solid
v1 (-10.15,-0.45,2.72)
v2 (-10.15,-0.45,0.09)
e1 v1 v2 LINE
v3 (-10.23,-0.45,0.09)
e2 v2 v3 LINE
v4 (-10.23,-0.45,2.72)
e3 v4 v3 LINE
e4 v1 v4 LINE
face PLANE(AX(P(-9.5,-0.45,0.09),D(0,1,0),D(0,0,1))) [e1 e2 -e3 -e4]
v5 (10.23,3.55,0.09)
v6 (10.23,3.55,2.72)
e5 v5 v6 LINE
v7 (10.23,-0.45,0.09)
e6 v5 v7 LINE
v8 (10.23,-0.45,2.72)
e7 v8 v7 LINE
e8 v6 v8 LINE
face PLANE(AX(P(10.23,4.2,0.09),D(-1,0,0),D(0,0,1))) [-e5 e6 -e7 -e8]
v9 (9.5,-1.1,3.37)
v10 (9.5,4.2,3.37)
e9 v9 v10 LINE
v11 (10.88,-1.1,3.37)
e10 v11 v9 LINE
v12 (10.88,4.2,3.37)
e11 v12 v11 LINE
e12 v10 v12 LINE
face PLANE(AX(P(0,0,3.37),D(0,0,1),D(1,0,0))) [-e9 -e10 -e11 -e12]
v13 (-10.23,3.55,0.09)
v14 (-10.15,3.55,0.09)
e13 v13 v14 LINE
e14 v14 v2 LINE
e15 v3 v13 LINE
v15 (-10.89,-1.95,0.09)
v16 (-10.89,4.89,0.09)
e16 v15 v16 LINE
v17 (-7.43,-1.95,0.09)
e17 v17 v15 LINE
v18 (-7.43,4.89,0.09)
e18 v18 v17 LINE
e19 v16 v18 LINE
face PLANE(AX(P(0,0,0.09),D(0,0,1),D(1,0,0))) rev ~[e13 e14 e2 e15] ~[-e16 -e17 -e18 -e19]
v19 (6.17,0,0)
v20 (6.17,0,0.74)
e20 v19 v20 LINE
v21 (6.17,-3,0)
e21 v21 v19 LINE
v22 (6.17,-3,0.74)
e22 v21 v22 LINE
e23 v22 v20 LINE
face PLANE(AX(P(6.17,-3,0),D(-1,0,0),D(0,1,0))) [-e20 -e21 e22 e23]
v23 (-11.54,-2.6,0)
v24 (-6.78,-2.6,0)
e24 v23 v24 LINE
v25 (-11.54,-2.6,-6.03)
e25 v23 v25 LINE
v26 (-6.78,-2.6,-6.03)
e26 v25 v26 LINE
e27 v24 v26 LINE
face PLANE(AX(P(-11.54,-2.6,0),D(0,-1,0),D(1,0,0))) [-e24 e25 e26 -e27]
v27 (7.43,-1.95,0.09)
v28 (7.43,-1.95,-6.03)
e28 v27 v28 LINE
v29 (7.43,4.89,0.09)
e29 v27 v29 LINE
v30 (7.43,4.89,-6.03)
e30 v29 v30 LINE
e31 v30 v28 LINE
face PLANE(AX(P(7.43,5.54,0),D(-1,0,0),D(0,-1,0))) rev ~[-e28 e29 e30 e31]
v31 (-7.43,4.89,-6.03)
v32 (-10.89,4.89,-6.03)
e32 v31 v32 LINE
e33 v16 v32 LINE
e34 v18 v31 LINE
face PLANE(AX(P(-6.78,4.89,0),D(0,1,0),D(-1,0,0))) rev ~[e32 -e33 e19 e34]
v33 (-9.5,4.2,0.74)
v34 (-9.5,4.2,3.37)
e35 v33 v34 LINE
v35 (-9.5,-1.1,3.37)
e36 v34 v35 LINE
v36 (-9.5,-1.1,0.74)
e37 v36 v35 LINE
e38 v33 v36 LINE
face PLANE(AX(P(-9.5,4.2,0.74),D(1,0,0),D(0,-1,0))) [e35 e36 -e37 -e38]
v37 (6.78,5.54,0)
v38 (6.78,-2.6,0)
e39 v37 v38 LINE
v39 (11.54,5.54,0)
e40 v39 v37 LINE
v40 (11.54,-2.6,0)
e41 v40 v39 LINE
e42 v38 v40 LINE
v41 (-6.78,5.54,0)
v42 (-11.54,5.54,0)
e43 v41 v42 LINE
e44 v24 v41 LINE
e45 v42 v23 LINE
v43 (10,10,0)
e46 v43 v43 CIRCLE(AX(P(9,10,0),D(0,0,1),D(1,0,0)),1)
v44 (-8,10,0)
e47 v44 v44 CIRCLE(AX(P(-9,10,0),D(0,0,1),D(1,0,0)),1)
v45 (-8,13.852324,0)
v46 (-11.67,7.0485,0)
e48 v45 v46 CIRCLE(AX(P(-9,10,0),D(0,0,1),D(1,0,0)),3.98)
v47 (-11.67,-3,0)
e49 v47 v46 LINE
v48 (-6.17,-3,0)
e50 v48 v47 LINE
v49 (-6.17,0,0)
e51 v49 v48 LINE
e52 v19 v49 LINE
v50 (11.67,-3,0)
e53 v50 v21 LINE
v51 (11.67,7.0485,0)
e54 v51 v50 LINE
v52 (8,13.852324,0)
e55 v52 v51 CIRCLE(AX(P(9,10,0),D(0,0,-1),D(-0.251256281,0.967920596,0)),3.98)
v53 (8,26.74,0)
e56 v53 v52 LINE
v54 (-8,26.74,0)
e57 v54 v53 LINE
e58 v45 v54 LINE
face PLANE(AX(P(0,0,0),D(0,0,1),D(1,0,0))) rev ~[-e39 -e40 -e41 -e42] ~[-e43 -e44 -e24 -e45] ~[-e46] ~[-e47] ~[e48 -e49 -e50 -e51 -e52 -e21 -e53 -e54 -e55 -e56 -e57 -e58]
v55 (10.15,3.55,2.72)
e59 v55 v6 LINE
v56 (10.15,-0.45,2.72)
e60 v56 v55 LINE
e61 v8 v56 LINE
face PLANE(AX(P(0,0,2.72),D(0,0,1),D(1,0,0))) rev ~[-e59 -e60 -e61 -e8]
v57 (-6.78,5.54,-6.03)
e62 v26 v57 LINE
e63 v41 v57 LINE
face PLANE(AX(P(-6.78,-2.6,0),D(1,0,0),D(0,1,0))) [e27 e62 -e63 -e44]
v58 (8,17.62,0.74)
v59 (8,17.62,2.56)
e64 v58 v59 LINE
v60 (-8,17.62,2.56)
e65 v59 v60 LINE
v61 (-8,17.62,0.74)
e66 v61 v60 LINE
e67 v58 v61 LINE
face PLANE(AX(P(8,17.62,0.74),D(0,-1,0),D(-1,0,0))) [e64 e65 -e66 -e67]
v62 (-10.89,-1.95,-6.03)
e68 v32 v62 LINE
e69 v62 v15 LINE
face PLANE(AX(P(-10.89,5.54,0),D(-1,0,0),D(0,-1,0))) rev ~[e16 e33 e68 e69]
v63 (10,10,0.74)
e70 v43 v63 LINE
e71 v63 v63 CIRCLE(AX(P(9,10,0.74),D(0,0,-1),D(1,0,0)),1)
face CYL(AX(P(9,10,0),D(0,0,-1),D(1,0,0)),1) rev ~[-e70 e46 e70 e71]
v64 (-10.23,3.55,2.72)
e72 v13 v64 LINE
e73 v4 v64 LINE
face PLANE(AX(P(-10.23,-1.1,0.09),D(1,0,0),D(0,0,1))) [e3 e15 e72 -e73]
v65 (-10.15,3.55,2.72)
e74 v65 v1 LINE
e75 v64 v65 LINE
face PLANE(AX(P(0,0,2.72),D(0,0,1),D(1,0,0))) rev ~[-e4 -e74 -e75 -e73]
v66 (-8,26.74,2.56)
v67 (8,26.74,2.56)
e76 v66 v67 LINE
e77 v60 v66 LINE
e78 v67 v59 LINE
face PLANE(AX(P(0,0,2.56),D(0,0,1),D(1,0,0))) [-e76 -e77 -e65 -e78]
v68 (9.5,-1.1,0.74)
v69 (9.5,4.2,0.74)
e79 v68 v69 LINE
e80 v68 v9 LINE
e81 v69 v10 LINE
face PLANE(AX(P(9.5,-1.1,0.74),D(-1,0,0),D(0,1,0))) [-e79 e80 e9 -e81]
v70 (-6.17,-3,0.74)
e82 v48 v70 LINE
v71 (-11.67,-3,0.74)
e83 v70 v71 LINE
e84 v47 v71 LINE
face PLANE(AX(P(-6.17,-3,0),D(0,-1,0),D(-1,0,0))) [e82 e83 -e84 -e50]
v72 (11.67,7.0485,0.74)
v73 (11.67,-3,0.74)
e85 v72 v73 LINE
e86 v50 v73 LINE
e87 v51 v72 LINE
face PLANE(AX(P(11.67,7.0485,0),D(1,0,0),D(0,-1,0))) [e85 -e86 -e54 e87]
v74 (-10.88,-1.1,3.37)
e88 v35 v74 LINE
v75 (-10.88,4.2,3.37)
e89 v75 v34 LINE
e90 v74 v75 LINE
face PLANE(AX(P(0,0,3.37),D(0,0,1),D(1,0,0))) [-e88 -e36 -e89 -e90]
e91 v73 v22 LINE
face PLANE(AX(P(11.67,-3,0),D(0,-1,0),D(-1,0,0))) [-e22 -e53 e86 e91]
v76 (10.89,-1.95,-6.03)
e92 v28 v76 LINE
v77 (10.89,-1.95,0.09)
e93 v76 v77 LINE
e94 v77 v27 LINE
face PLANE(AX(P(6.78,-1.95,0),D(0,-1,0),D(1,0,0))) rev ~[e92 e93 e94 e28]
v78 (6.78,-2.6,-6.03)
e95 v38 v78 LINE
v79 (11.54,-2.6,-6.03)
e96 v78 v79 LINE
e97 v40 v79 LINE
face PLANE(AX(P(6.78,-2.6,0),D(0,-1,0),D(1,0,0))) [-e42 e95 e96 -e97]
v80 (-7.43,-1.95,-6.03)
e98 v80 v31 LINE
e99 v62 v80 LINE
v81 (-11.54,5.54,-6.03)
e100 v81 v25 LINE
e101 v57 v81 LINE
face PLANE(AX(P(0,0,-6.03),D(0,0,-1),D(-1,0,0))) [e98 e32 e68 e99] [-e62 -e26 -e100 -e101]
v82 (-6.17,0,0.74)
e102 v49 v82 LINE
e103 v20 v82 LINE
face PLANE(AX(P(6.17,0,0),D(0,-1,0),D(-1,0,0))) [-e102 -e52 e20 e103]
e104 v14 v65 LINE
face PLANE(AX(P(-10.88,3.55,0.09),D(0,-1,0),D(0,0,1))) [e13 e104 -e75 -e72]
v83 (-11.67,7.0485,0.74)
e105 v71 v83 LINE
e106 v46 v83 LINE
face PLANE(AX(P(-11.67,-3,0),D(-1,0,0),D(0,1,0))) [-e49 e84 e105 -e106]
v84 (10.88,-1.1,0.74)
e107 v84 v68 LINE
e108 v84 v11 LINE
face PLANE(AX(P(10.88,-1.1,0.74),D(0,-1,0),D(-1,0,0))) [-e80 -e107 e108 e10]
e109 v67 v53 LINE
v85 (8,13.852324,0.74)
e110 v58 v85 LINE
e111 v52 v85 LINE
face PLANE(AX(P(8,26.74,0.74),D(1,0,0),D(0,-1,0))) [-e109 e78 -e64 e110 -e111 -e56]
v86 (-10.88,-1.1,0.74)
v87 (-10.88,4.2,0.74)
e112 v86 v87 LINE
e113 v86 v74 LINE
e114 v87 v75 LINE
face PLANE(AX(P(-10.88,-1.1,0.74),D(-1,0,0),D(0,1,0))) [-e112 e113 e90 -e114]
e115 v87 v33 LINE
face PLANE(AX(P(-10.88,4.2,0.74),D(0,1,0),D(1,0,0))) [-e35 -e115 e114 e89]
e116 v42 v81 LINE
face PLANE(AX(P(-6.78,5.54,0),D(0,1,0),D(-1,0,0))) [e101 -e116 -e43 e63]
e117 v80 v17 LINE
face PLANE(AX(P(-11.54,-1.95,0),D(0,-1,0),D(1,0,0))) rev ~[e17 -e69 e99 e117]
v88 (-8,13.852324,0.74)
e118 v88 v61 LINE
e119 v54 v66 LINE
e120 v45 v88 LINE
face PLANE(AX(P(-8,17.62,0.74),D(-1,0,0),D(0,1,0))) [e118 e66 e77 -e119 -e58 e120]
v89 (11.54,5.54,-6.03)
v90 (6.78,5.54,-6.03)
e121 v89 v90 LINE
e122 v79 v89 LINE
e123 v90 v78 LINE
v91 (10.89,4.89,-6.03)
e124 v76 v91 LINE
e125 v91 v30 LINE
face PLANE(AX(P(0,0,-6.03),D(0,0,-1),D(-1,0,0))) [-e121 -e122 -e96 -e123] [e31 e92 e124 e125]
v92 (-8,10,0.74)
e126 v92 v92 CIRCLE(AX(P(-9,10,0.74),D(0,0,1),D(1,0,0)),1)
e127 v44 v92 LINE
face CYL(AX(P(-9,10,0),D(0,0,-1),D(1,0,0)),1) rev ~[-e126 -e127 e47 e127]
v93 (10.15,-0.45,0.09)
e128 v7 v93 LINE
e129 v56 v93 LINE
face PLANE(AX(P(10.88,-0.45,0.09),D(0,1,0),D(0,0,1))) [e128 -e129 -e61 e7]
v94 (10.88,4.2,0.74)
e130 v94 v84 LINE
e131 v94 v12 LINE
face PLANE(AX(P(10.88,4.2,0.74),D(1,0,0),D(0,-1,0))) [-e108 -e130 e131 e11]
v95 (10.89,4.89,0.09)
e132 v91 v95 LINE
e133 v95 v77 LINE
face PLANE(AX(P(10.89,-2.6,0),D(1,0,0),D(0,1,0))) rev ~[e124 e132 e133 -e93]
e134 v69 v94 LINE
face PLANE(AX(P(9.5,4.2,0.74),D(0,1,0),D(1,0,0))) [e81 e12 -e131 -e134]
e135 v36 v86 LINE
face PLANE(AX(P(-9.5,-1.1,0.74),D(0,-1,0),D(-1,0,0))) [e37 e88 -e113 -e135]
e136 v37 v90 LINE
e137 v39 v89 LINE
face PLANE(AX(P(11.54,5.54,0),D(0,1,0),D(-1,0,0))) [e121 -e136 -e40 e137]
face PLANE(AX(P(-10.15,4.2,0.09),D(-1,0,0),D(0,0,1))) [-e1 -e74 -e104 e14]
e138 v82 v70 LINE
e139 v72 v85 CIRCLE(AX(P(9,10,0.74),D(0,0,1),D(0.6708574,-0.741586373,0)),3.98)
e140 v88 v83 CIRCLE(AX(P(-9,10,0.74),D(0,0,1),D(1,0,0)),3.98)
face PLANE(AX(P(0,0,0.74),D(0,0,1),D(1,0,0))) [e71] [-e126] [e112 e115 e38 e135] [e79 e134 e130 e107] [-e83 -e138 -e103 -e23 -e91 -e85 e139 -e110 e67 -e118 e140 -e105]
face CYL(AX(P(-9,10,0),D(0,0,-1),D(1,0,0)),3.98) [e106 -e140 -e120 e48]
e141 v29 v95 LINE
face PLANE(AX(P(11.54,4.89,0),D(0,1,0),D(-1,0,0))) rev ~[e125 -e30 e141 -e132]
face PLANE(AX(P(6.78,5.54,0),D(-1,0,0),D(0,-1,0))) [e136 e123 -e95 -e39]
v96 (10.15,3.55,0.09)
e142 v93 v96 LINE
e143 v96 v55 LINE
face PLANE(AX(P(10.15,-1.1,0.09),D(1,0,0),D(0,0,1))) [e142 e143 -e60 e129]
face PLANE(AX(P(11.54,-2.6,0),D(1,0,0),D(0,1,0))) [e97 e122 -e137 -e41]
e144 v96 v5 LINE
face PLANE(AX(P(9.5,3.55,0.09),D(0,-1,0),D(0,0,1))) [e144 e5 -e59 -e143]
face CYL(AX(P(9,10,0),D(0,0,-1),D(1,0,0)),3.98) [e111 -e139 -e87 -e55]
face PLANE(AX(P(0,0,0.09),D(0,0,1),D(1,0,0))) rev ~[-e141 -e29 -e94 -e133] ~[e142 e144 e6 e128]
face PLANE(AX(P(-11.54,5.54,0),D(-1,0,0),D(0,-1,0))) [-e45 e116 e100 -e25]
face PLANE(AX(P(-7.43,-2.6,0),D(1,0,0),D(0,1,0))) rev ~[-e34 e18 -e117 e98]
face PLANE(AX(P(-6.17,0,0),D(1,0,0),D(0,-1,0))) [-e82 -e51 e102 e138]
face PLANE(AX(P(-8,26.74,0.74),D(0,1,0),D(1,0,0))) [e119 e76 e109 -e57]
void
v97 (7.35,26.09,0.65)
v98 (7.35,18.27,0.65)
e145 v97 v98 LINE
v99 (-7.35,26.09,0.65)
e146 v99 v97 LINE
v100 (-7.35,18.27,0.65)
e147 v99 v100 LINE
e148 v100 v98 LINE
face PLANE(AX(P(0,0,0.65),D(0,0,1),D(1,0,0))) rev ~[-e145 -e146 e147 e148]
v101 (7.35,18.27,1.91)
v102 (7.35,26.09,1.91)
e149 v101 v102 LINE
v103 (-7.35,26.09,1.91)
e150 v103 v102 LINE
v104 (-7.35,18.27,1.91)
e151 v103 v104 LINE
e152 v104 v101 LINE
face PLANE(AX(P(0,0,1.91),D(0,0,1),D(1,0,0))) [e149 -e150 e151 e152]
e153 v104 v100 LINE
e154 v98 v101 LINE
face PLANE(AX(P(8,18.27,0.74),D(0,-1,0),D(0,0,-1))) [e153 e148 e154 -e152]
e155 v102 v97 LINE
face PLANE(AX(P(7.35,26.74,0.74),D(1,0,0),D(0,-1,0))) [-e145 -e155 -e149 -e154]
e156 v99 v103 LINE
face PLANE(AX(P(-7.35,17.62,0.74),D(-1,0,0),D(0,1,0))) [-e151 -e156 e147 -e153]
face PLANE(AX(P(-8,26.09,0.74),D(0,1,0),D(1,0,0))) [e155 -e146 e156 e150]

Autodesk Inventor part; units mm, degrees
ref_plane "YZ Plane" through (0, 0, 0) normal (1, 0, 0) x (0, 1, 0)
ref_plane "XZ Plane" through (0, 0, 0) normal (0, 1, 0) x (-1, 0, 0)
ref_plane "XY Plane" through (0, 0, 0) normal (0, 0, 1) x (1, 0, 0)
sketch "Boceto1" plane through (0, 0, 0) normal (0, 0, 1) x (1, 0, 0)
  line L0 (-8, 26.74) -> (8, 26.74)
  line L1 (8, 26.74) -> (8, 0)
  line L2 (8, 0) -> (-8, 0)
  line L3 (-8, 0) -> (-8, 26.74)
  line L4 (6.17, 7.0485) -> (11.67, 7.0485)
  line L5 (11.67, 7.0485) -> (11.67, -3)
  line L6 (11.67, -3) -> (6.17, -3)
  line L7 (6.17, -3) -> (6.17, 7.0485)
  line L8 (-11.67, 7.0485) -> (-6.17, 7.0485)
  line L9 (-6.17, 7.0485) -> (-6.17, -3)
  line L10 (-6.17, -3) -> (-11.67, -3)
  line L11 (-11.67, -3) -> (-11.67, 7.0485)
  circle A0 centre (-9, 10) radius 1
  circle A1 centre (9, 10) radius 1
  circle A2 centre (-9, 10) radius 3.98
  circle A3 centre (9, 10) radius 3.98
  point P0 (0, 0)
  point P1 (0, 0)
  dimension "d0" = 16
  dimension "d1" = 26.74
  dimension "d2" = 5.5
  dimension "d3" = 23.34
  dimension "d6" = 11.67
  dimension "d7" = 29.74
  dimension "d8" = 2
  dimension "d9" = 25.96
  dimension "d10" = 13
extrude "Extrusión1" add sketch "Boceto1" along normal blind 0.74
sketch "Boceto2" plane through (0, 0, 0.74) normal (0, 0, 1) x (1, 0, 0)
  line L0 (-8, 26.74) -> (8, 26.74)
  line L1 (8, 26.74) -> (8, 17.62)
  line L2 (8, 17.62) -> (-8, 17.62)
  line L3 (-8, 17.62) -> (-8, 26.74)
  point P0 (0, 0)
  dimension "d13" = 9.12
extrude "Extrusión2" add sketch "Boceto2" along normal blind 1.82
sketch "Boceto3" plane through (0, 0, 0.74) normal (0, 0, 1) x (1, 0, 0)
  line L0 (9.5, 4.2) -> (10.88, 4.2)
  line L1 (10.88, 4.2) -> (10.88, -1.1)
  line L2 (10.88, -1.1) -> (9.5, -1.1)
  line L3 (9.5, -1.1) -> (9.5, 4.2)
  line L4 (-10.88, 4.2) -> (-9.5, 4.2)
  line L5 (-9.5, 4.2) -> (-9.5, -1.1)
  line L6 (-9.5, -1.1) -> (-10.88, -1.1)
  line L7 (-10.88, -1.1) -> (-10.88, 4.2)
  line L8 (-11.67, 7.0485) -> (-11.67, -3) projected
  line L9 (6.17, -3) -> (11.67, -3) projected
  point P0 (0, 0)
  dimension "d16" = 5.3
  dimension "d17" = 1.38
  dimension "d18" = 19
  dimension "d19" = 0.79
  dimension "d20" = 7.2
extrude "Extrusión3" add sketch "Boceto3" along normal blind 2.63
sketch "Boceto4" plane through (0, 0, 0) normal (0, 0, -1) x (-1, 0, 0)
  line L0 (-6.78, -2.6) -> (-11.54, -2.6)
  line L1 (-11.54, -2.6) -> (-11.54, 5.54)
  line L2 (-11.54, 5.54) -> (-6.78, 5.54)
  line L3 (-6.78, 5.54) -> (-6.78, -2.6)
  line L4 (11.54, -2.6) -> (6.78, -2.6)
  line L5 (6.78, -2.6) -> (6.78, 5.54)
  line L6 (6.78, 5.54) -> (11.54, 5.54)
  line L7 (11.54, 5.54) -> (11.54, -2.6)
  line L8 (8, 26.74) -> (-8, 26.74) projected
  point P0 (0, 0)
  dimension "d23" = 4.76
  dimension "d24" = 23.08
  dimension "d25" = 29.34
  dimension "d26" = 11.54
  dimension "d27" = 8.14
extrude "Extrusión4" add sketch "Boceto4" along normal blind 6.03
shell "Vaciado1" thickness 0.65 removed faces 2 at (8.3667, 0.1133, -6.03) at (-8.3667, 2.8267, -6.03)
equation "\"d26\" = 0.5 * d24"
properties part number "Encoder" material "Plástico ABS"
